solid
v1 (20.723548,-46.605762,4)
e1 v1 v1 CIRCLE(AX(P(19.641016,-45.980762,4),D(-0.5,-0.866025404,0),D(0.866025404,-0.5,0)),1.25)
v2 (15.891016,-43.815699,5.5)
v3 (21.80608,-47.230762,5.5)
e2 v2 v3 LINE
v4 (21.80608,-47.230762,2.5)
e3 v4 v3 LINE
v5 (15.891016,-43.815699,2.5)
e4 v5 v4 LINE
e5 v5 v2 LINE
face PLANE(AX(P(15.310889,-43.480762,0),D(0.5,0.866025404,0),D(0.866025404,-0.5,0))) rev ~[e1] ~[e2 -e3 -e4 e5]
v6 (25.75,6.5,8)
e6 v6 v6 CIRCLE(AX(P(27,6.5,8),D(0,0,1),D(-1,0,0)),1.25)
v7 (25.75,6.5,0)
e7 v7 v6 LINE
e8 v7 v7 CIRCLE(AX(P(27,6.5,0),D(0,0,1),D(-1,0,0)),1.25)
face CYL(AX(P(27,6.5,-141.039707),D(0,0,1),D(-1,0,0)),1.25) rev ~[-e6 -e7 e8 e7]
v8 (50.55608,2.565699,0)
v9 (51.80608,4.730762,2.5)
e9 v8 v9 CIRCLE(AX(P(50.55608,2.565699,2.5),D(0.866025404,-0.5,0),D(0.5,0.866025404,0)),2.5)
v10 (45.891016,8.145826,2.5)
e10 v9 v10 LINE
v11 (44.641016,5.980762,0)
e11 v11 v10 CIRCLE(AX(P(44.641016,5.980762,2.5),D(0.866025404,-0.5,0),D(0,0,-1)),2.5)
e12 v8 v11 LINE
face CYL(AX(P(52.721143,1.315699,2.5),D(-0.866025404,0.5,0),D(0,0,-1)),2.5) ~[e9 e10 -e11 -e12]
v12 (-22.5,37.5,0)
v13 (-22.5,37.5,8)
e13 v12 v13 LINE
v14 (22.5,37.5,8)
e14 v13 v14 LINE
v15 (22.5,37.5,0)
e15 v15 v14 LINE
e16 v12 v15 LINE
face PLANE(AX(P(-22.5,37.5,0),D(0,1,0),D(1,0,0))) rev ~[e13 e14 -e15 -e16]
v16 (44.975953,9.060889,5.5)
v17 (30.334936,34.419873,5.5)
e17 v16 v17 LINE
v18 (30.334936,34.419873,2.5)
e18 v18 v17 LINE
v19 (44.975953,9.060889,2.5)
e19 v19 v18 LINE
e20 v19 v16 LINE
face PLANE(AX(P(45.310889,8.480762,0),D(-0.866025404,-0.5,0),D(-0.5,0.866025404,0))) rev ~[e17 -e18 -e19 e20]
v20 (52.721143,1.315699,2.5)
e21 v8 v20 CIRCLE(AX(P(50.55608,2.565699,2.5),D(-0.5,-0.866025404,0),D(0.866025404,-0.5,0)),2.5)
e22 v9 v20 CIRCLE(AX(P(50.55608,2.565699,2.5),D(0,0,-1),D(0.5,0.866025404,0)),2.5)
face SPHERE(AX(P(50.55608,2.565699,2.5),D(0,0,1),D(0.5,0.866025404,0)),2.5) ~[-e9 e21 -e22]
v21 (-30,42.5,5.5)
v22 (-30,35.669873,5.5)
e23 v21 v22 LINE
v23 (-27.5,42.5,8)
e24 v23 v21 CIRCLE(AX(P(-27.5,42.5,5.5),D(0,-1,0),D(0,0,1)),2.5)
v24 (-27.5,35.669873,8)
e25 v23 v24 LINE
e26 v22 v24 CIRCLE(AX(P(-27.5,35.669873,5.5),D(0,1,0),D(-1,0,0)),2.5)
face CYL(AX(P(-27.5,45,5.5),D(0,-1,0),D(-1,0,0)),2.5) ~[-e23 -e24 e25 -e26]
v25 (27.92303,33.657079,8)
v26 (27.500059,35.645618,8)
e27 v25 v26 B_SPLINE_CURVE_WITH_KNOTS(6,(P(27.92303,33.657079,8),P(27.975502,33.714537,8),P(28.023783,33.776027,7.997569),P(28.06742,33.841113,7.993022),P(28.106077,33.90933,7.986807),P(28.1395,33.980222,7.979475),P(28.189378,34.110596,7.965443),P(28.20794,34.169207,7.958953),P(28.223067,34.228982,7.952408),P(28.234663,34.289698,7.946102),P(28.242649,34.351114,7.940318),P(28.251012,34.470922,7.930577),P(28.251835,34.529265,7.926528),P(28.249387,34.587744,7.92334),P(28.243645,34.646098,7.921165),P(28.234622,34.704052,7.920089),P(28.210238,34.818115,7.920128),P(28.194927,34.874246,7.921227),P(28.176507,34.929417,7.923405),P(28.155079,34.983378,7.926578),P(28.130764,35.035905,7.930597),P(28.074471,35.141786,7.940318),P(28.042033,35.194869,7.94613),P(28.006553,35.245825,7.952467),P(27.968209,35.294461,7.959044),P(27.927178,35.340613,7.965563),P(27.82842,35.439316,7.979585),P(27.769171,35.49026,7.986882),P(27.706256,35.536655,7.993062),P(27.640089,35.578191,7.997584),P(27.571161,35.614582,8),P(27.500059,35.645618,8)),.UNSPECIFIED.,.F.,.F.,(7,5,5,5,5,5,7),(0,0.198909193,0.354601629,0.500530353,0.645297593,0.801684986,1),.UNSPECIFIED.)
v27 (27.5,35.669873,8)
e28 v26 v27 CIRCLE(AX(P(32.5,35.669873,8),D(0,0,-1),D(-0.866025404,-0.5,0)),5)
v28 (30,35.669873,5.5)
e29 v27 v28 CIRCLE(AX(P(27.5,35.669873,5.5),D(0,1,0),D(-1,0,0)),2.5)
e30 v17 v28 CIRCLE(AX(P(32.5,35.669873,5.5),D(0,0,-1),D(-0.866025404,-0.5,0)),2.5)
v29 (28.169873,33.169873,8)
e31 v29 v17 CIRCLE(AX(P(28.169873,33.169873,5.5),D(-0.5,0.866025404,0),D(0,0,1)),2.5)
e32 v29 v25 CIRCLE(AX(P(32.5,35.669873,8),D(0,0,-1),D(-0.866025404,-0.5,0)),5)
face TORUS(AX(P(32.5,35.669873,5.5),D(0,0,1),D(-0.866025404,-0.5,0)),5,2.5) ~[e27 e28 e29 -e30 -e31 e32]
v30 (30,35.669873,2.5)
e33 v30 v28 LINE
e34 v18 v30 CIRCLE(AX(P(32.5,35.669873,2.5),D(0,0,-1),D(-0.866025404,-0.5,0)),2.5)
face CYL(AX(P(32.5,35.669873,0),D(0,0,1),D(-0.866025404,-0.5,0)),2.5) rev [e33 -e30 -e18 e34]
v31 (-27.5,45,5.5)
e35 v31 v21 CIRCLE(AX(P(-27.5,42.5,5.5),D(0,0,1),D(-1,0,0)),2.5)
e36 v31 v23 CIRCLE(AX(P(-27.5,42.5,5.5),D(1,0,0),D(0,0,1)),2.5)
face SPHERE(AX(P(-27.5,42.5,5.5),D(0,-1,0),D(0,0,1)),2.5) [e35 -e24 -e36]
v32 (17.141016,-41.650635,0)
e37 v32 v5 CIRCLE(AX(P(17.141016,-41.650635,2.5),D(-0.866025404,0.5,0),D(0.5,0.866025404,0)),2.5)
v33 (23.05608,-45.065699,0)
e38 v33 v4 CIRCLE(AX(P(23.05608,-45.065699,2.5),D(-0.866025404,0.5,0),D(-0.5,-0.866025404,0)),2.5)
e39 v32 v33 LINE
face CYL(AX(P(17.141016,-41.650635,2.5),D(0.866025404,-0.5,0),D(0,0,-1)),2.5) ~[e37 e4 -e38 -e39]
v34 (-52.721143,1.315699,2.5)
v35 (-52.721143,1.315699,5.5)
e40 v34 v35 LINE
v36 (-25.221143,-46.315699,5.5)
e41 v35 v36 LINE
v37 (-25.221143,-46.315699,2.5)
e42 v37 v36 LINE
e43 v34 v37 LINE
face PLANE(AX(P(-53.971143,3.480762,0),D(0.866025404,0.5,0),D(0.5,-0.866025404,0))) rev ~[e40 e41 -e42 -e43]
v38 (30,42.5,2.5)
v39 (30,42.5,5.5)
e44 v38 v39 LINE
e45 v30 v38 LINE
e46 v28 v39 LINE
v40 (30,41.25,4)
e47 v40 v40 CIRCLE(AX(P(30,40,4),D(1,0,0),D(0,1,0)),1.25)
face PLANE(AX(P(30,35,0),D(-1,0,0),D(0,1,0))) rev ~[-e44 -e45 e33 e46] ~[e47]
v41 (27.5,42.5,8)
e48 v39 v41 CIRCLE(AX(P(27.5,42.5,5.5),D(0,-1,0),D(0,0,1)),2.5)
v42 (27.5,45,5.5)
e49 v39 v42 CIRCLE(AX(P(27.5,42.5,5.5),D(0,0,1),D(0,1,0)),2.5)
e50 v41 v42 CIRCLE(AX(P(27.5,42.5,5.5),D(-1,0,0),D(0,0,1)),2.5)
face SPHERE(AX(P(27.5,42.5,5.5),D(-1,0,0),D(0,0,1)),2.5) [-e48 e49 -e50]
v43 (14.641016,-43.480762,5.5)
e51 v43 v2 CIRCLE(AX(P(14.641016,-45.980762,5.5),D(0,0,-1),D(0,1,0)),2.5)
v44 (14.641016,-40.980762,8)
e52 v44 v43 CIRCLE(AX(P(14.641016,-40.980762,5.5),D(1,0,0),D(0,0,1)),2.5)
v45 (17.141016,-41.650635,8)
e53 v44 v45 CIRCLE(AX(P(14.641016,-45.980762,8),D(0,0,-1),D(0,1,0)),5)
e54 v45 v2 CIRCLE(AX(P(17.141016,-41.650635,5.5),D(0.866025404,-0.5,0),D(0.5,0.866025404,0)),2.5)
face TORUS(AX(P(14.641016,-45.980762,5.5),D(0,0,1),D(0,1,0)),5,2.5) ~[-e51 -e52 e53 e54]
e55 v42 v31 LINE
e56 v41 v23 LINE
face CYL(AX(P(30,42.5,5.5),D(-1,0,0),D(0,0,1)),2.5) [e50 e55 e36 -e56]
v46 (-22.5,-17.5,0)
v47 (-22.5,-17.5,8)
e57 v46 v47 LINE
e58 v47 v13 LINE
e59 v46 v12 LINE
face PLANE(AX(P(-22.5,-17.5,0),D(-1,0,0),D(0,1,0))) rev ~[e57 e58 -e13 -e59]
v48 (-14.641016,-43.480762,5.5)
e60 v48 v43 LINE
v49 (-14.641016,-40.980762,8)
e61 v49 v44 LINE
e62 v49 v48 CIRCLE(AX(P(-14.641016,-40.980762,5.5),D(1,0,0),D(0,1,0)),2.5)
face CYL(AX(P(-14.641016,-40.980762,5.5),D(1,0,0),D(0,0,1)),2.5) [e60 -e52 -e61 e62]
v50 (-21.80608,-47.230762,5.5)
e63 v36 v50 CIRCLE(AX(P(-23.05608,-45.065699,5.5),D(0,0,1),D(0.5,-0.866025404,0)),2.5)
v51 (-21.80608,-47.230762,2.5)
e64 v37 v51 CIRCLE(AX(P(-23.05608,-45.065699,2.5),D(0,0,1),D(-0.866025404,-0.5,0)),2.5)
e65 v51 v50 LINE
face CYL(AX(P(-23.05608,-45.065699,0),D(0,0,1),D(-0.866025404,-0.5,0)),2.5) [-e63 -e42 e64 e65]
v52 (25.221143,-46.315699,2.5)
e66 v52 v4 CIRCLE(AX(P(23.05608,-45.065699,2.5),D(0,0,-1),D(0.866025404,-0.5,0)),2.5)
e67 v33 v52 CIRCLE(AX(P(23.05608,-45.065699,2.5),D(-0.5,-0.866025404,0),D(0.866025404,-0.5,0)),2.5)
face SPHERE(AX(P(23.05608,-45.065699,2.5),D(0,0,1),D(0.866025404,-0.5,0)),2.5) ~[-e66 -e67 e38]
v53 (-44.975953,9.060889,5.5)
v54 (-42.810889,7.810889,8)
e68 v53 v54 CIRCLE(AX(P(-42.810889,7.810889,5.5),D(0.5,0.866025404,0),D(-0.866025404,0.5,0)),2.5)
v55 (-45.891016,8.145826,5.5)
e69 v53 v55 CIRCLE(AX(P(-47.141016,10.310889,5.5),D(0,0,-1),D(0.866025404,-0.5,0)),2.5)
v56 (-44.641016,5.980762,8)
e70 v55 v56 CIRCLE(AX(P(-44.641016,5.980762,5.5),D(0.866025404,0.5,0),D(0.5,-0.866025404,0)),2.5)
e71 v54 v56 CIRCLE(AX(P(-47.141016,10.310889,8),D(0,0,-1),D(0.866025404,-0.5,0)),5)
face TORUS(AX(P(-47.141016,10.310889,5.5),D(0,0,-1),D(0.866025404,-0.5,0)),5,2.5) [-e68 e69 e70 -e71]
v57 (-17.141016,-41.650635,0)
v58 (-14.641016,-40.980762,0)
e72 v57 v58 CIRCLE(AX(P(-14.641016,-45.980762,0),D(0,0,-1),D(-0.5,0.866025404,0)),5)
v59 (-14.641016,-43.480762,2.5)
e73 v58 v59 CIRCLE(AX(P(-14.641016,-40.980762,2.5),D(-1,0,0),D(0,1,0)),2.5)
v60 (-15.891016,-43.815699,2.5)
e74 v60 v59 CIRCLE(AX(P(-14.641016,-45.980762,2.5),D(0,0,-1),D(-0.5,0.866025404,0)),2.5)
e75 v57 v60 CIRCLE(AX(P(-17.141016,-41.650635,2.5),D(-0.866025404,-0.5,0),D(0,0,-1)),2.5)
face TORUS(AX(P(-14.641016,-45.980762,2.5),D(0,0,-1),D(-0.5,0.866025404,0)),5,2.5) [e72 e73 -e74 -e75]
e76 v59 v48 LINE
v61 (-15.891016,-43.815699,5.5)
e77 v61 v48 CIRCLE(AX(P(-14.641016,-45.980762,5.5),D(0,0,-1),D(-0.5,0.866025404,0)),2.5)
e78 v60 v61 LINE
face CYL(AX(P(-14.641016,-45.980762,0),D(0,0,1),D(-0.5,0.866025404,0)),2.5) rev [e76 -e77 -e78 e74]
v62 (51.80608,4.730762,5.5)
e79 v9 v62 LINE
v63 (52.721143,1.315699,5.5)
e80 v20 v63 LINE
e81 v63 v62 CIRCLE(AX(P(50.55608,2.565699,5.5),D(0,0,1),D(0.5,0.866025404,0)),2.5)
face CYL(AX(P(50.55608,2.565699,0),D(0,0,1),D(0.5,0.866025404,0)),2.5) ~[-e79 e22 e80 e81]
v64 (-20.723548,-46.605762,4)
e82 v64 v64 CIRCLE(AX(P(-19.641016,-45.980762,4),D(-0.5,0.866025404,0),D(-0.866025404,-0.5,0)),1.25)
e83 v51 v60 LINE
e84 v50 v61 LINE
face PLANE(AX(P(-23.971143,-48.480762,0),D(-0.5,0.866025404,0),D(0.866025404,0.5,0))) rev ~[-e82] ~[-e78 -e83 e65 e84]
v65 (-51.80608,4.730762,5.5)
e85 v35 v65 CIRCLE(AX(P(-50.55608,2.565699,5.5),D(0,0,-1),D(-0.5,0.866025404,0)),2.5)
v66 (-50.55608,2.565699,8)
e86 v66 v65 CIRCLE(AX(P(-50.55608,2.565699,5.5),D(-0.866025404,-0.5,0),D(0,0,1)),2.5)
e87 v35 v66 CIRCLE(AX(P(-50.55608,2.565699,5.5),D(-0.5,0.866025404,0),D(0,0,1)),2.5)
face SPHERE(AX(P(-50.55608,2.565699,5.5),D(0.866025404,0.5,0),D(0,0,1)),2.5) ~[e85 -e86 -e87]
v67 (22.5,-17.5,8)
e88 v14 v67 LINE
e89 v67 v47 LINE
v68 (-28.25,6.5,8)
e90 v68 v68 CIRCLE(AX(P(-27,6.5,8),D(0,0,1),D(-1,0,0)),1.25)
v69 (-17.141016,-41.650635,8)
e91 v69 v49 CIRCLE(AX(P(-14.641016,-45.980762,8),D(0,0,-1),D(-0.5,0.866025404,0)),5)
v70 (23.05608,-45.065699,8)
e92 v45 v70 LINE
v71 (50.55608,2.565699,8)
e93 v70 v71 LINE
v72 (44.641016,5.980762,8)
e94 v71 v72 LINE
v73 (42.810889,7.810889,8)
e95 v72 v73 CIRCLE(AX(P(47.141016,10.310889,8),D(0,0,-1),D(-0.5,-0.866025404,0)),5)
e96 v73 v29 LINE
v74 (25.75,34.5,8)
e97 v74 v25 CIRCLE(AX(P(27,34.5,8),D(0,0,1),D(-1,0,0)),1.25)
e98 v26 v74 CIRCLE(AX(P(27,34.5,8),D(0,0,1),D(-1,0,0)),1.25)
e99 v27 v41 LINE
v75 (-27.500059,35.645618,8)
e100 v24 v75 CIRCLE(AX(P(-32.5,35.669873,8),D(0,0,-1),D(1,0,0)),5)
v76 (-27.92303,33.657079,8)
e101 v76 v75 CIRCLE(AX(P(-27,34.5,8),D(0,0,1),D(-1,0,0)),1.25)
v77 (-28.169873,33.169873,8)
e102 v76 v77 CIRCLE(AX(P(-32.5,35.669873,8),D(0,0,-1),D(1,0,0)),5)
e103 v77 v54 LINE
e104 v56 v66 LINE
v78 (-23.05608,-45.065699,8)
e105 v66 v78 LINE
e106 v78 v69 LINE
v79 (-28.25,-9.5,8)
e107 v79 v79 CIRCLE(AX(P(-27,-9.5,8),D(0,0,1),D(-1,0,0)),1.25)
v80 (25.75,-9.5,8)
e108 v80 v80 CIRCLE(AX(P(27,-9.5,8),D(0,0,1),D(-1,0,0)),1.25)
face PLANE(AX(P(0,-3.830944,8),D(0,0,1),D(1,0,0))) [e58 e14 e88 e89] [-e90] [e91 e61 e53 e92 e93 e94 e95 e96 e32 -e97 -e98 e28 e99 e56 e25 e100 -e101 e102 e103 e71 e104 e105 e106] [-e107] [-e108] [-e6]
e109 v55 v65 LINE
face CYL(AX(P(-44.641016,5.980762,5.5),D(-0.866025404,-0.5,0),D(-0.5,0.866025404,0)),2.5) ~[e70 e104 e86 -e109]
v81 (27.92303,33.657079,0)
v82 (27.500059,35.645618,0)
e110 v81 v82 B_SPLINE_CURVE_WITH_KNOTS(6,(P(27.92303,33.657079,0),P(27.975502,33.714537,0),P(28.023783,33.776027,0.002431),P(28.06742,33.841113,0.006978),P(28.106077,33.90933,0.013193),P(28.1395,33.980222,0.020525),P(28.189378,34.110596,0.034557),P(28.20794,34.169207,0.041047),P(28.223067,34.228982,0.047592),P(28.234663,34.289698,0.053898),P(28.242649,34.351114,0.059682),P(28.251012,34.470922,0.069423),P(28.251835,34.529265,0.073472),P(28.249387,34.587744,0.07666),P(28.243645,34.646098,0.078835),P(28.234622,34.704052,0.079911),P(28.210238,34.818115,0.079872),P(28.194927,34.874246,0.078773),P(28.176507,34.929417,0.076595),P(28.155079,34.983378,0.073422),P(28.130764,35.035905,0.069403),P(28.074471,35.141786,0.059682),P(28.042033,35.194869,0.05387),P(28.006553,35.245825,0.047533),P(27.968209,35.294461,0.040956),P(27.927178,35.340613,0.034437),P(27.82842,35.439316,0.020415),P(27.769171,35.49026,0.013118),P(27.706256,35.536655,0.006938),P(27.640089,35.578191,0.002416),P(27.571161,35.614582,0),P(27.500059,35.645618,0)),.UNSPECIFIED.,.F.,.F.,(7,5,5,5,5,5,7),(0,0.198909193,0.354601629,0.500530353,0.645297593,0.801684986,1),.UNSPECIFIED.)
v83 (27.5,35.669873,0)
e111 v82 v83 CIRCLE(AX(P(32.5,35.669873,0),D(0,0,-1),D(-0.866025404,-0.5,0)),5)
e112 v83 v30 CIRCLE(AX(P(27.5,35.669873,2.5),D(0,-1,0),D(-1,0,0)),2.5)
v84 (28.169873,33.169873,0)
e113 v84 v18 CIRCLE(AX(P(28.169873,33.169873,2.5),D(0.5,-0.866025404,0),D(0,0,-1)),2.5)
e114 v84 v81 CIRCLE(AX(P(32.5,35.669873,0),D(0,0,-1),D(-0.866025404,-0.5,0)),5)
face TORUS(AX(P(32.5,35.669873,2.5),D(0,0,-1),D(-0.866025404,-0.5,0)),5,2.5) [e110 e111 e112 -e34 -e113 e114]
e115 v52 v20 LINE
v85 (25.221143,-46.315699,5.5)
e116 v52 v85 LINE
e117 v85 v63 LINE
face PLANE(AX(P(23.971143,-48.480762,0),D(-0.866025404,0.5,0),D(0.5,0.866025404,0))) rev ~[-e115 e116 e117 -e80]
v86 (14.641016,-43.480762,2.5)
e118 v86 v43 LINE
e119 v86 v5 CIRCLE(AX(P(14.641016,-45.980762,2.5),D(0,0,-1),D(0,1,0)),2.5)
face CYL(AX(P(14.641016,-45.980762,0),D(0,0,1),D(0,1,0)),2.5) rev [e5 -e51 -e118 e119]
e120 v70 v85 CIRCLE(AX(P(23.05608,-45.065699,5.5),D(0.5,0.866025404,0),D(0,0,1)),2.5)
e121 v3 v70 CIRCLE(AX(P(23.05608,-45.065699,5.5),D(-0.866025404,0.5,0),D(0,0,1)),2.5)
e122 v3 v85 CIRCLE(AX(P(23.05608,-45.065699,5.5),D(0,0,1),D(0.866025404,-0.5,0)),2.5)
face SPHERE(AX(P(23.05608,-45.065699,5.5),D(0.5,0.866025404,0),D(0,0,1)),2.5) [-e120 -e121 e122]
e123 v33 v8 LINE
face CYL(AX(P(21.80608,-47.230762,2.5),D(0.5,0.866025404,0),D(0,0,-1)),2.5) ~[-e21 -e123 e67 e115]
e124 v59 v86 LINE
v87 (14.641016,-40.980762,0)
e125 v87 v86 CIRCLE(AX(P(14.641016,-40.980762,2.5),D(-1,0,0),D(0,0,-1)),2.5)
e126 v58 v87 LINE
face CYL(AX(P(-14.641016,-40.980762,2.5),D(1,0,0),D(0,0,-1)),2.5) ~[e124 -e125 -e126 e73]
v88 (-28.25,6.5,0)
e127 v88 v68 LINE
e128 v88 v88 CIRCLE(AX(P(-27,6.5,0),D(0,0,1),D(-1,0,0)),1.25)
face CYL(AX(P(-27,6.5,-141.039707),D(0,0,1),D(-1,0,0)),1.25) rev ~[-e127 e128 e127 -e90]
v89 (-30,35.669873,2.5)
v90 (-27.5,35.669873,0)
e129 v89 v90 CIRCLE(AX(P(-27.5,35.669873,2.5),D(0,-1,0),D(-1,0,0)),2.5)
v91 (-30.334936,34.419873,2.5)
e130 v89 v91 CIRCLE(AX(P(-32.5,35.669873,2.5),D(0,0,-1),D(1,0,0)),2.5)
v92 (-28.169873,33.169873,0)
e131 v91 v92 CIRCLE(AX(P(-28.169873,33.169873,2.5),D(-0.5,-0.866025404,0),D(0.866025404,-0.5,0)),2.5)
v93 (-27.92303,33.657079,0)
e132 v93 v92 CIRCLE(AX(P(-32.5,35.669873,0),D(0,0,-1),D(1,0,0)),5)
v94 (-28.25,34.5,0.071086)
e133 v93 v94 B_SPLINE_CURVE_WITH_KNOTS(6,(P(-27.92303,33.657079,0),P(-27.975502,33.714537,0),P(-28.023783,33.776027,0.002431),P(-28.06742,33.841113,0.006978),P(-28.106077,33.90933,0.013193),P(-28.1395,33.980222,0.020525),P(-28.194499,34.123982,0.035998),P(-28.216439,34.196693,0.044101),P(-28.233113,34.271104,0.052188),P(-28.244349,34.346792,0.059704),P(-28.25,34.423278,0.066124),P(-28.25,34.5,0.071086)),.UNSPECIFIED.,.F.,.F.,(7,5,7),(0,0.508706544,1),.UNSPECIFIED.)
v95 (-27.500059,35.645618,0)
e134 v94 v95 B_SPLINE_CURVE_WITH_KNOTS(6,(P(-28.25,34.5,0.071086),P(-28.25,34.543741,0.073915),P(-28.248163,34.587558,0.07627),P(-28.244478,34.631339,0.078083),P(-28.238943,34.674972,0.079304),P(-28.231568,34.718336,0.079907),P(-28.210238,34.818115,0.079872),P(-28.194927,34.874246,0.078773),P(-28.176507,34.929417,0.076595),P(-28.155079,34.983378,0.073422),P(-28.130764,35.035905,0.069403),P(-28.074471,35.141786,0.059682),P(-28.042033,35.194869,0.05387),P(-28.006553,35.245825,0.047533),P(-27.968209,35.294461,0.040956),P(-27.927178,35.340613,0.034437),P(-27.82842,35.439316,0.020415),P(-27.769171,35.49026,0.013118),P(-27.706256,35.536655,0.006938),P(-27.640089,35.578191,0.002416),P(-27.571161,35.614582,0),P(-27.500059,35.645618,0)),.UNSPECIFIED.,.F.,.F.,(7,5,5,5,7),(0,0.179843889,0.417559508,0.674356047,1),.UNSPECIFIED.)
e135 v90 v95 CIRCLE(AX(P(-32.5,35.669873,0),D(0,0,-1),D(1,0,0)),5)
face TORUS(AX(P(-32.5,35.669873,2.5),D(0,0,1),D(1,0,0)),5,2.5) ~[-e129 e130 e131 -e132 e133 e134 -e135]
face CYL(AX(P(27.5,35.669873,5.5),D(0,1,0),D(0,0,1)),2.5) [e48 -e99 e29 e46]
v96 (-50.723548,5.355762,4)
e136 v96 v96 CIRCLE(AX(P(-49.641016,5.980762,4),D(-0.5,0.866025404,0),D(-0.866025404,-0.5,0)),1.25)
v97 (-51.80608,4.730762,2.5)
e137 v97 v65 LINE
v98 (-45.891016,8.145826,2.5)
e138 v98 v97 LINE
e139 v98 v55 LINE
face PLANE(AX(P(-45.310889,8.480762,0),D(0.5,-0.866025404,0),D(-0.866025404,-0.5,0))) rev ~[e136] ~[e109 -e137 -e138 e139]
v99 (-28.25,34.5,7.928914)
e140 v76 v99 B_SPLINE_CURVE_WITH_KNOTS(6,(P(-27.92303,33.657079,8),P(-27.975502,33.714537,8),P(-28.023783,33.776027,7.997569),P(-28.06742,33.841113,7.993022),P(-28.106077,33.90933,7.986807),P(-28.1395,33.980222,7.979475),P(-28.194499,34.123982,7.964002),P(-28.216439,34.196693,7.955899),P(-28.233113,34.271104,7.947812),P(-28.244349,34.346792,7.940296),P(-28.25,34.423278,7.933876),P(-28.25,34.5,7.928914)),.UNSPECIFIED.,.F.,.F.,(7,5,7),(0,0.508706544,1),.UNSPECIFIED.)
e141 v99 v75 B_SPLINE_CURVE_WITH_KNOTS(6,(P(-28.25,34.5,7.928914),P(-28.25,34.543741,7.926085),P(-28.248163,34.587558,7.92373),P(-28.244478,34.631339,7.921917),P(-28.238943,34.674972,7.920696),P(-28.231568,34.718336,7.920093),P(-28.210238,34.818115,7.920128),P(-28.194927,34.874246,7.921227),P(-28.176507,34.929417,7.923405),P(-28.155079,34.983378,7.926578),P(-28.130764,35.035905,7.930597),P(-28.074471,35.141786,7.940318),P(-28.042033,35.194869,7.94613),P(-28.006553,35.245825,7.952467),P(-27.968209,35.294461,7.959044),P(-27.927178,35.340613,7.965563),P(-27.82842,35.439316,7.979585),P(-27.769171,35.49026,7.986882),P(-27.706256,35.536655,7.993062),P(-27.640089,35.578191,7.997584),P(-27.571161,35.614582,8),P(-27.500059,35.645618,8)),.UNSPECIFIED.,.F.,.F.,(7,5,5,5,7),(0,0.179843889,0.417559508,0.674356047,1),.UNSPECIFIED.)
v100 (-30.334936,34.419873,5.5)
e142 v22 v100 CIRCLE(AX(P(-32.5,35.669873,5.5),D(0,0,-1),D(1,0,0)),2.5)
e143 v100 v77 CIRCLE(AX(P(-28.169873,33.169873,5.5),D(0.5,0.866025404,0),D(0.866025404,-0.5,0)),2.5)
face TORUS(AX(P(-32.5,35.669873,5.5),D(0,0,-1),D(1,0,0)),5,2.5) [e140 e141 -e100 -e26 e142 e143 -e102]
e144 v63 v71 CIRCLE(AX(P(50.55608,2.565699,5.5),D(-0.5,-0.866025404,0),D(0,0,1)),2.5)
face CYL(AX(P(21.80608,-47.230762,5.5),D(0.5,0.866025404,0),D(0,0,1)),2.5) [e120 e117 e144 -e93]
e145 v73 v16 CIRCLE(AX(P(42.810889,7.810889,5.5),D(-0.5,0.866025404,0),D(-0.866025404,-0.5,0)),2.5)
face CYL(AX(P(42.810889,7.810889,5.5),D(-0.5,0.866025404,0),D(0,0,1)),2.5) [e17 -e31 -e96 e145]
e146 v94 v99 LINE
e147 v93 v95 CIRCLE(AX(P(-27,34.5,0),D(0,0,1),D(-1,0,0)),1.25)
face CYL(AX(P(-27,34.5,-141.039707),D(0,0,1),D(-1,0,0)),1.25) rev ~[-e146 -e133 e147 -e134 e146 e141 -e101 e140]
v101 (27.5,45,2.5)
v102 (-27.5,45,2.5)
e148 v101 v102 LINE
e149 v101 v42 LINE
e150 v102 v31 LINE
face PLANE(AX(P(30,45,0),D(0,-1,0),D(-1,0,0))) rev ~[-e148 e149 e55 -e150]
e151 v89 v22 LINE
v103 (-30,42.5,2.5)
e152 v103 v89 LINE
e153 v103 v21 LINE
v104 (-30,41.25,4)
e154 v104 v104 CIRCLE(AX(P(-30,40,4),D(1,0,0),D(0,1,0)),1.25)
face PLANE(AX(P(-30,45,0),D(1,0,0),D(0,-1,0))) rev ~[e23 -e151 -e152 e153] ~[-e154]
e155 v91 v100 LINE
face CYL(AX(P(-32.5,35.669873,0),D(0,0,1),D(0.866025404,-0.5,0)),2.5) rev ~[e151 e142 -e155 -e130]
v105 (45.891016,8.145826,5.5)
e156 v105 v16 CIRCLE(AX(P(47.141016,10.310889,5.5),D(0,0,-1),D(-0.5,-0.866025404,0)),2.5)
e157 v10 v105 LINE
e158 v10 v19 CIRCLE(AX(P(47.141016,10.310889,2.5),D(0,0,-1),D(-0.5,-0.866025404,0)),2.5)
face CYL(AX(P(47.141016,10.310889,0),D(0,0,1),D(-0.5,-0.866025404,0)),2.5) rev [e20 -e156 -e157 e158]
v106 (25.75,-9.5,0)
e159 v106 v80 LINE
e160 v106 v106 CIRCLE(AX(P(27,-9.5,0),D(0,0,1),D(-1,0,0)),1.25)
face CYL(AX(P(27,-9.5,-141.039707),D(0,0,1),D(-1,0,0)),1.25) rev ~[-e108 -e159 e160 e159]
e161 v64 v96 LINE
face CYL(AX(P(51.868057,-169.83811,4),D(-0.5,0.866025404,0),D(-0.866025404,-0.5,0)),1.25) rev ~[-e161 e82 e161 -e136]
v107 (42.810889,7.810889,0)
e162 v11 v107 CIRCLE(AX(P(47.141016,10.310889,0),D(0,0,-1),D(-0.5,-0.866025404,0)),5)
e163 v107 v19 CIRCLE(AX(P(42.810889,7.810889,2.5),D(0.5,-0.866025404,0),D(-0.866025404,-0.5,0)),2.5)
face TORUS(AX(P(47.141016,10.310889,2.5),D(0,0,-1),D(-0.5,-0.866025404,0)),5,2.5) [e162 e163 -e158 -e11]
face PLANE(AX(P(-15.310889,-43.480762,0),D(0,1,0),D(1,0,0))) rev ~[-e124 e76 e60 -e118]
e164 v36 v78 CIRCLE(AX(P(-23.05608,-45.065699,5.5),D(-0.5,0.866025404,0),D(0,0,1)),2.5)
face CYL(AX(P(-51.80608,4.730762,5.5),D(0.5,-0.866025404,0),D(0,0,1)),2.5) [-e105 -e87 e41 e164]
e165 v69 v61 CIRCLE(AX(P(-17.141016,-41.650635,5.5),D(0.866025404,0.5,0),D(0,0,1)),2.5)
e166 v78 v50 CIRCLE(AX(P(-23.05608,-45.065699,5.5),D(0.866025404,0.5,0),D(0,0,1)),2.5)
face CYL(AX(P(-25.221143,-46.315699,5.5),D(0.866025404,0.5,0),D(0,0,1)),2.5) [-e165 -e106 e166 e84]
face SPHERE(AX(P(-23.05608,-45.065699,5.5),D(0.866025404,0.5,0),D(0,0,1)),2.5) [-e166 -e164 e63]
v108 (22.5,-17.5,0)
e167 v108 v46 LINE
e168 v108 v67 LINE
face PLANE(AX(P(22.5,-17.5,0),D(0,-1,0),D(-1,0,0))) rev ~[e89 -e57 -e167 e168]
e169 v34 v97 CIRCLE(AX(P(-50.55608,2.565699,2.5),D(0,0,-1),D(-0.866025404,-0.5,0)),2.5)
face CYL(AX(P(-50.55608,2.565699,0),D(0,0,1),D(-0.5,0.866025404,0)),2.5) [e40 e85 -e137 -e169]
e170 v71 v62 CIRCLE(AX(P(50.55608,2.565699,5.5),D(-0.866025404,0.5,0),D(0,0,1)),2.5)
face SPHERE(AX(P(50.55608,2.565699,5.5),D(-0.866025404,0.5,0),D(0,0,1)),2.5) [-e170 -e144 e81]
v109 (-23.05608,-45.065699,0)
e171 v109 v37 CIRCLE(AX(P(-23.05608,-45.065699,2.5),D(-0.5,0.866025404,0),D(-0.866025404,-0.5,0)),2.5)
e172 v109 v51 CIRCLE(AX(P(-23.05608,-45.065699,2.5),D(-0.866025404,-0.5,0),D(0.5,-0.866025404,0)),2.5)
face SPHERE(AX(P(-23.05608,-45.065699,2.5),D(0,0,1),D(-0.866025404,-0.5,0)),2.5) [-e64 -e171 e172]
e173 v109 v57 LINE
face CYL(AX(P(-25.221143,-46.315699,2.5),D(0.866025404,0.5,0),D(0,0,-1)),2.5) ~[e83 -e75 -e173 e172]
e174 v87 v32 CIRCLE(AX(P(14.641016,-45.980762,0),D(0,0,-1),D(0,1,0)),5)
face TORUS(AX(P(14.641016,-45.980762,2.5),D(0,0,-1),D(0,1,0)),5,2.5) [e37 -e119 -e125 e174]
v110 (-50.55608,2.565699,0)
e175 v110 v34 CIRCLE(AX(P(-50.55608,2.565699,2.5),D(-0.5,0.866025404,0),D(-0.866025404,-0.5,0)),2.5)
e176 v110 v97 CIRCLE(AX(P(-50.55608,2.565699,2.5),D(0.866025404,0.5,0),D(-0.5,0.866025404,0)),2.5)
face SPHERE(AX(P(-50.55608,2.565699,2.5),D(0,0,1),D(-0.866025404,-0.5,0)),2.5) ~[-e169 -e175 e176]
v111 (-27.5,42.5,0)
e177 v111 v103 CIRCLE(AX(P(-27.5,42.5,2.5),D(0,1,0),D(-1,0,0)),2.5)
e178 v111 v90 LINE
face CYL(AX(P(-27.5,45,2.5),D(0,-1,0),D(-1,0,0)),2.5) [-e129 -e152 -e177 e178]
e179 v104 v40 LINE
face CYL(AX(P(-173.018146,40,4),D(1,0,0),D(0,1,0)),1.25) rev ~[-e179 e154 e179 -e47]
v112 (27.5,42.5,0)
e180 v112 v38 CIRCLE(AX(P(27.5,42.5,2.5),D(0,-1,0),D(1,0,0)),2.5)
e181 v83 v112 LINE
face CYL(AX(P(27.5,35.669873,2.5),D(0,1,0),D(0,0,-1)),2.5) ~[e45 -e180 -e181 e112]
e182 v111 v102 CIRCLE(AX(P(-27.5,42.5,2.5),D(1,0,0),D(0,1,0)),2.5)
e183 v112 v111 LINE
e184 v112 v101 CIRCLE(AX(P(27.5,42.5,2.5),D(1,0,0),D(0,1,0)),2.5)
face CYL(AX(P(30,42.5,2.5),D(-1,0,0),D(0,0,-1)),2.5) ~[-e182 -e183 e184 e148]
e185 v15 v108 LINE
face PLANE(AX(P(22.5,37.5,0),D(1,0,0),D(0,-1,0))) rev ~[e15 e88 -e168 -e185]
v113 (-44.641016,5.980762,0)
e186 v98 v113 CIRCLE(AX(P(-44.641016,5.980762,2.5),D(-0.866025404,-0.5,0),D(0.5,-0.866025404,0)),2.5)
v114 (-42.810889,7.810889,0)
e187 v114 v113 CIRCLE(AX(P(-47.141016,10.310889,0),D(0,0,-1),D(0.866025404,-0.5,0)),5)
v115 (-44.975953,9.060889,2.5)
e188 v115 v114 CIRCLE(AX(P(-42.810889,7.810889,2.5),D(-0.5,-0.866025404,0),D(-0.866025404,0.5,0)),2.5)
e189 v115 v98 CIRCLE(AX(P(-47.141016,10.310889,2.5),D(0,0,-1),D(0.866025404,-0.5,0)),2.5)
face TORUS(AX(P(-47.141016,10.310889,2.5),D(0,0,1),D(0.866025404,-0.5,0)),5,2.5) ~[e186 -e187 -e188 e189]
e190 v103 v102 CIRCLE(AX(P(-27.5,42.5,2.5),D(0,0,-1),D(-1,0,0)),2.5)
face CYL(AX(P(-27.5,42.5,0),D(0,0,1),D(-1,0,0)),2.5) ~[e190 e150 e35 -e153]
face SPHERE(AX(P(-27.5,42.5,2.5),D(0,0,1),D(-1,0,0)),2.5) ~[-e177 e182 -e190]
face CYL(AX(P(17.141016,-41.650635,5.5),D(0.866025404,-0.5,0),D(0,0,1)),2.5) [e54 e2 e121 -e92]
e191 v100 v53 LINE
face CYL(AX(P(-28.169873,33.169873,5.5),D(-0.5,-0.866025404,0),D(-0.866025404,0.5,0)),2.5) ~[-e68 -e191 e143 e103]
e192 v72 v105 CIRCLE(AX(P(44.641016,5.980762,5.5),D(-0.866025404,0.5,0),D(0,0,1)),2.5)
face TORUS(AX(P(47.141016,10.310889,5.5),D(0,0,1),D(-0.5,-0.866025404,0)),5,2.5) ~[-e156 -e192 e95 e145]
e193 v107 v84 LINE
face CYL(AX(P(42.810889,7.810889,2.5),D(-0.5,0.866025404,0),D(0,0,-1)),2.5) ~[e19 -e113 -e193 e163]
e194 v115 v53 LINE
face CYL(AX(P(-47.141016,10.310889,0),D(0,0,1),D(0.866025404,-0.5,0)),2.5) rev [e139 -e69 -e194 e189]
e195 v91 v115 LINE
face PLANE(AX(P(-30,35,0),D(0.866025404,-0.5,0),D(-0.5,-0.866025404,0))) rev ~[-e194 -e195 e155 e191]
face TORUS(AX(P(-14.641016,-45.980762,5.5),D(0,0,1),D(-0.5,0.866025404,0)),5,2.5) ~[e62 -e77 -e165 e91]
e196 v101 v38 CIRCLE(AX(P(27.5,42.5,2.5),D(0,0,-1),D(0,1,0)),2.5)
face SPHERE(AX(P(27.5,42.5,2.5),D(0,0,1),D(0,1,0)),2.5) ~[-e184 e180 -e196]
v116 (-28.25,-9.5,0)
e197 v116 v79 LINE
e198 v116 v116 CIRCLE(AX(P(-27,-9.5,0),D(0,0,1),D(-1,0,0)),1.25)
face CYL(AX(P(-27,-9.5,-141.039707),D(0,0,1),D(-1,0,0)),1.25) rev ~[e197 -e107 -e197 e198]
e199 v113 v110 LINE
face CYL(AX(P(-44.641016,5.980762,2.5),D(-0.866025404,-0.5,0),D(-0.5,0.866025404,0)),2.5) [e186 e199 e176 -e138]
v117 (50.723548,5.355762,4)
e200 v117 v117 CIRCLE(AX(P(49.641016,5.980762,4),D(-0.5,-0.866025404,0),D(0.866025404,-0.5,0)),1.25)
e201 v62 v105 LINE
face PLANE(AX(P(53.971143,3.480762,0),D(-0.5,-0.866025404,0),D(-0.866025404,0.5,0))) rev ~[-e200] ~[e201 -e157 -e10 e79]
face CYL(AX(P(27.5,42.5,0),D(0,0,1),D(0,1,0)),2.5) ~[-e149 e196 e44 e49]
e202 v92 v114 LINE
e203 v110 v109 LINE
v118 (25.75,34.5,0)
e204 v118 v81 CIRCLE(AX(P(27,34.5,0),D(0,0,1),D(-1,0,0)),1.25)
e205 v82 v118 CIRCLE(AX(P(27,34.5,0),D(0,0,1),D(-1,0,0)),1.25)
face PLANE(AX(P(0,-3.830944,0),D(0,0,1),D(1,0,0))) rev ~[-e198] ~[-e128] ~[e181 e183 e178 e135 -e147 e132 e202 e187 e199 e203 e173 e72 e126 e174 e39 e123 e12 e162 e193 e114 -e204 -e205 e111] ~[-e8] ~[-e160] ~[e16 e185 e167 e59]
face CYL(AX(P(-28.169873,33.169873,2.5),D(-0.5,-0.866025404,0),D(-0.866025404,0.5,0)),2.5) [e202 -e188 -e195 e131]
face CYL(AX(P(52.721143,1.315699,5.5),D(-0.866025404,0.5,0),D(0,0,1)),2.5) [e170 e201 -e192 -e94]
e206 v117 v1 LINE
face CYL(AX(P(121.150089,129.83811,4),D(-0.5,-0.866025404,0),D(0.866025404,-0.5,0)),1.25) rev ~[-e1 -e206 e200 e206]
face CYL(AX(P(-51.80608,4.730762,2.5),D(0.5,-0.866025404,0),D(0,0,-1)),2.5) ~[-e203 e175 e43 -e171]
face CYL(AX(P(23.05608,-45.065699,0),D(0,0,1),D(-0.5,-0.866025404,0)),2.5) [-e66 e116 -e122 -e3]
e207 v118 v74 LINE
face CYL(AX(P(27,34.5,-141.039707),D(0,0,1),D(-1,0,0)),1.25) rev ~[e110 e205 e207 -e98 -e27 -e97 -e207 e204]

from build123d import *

# Parameters (mm, degrees)
F1_DEPTH = 8
F3_D     = 2.5
F5_D     = 2.5
F7_D     = 2.5
F8_F1_R  = 2.5
F8_F2_R  = 2.5
F9_D     = 2.5


with BuildPart() as f1:
    # F0 (on Top) → F1 (new body)
    with BuildSketch(Plane.XY):
        Polygon((-22.5, 35), (-30, 35), (-45.3108891325, 8.4807621135), (-15.3108891325, -43.4807621135), (15.3108891325, -43.4807621135), (45.3108891325, 8.4807621135), (30, 35), (22.5, 35), (22.5, 17.5), (22.5, -17.5), (-22.5, -17.5), (-22.5, 17.5), align=None)
        Polygon((-15.3108891325, -43.4807621135), (-45.3108891325, 8.4807621135), (-53.9711431703, 3.4807621135), (-23.9711431703, -48.4807621135), align=None)
        Polygon((30, 45), (-30, 45), (-30, 35), (-22.5, 35), (-22.5, 37.5), (22.5, 37.5), (22.5, 35), (30, 35), align=None)
        Polygon((53.9711431703, 3.4807621135), (45.3108891325, 8.4807621135), (15.3108891325, -43.4807621135), (23.9711431703, -48.4807621135), align=None)
    extrude(amount=F1_DEPTH)

    # F3 (through all)
    with Locations(Plane(origin=(-30, 0, 0), x_dir=(0, -1, 0), z_dir=(-1, 0, 0))):
        with Locations((-40, 4)):
            Hole(F3_D / 2)

    # F5 (through all)
    with Locations(Plane(origin=(15, -25.9807621135, 0), x_dir=(0.8660254038, 0.5, 0), z_dir=(0.5, -0.8660254038, 0))):
        with Locations((-40, 4)):
            Hole(F5_D / 2)

    # F7 (through all)
    with Locations(Plane(origin=(15, 25.9807621135, 0), x_dir=(-0.8660254038, 0.5, 0), z_dir=(0.5, 0.8660254038, 0))):
        with Locations((-40, 4)):
            Hole(F7_D / 2)

    # F8: fillet of radius 2.5 on 32 edges, made by hand

    # F8_f1
    f8_f1_edges = [f1.edges().sort_by_distance(p)[0] for p in [
        (-45.3108891325, 8.4807621135, 4),
        (-30, 35, 4),
        (30, 35, 4),
        (45.3108891325, 8.4807621135, 4),
        (15.3108891325, -43.4807621135, 4),
        (-15.3108891325, -43.4807621135, 4),
    ]]
    fillet(f8_f1_edges, radius=F8_F1_R)

    # F8_f2
    f8_f2_edges = [f1.edges().sort_by_distance(p)[0] for p in [
        (-37.6554445662, 21.7403810568, 8),
        (-30, 40.3349364905, 8),
        (0, 45, 8),
        (37.6554445662, 21.7403810568, 8),
        (30, 40.3349364905, 8),
        (49.9310796608, 5.8132938683, 8),
        (38.9711431703, -22.5, 8),
        (19.9310796608, -46.1482303588, 8),
        (0, -43.4807621135, 8),
        (-19.9310796608, -46.1482303588, 8),
        (-38.9711431703, -22.5, 8),
        (-49.9310796608, 5.8132938683, 8),
        (-53.9711431703, 3.4807621135, 4),
        (-30, 45, 4),
        (30, 45, 4),
        (53.9711431703, 3.4807621135, 4),
        (23.9711431703, -48.4807621135, 4),
        (-23.9711431703, -48.4807621135, 4),
        (-38.9711431703, -22.5, 0),
        (-37.6554445662, 21.7403810568, 0),
        (0, 45, 0),
        (30, 40.3349364905, 0),
        (38.9711431703, -22.5, 0),
        (19.9310796608, -46.1482303588, 0),
        (0, -43.4807621135, 0),
        (-19.9310796608, -46.1482303588, 0),
        (-15.2880637641, -43.5659475478, 0),
        (15.2880637641, -43.5659475478, 0),
        (30.0851854343, 35.0228253683, 0),
        (-30.0851854343, 35.0228253683, 0),
        (-45.3732491984, 8.5431221795, 0),
        (-45.3732491984, 8.5431221795, 8),
        (-15.2880637641, -43.5659475478, 8),
        (15.2880637641, -43.5659475478, 8),
        (45.3732491984, 8.5431221795, 8),
        (30.0851854343, 35.0228253683, 8),
        (-30.0851854343, 35.0228253683, 8),
    ]]
    fillet(f8_f2_edges, radius=F8_F2_R)

    # F9 (through all)
    with Locations(Plane(origin=(0, 0, 0), x_dir=(1, 0, 0), z_dir=(0, 0, -1))):
        with Locations((-27, -6.5), (-27, 9.5), (27, 9.5), (27, -6.5), (-27, -34.5), (27, -34.5)):
            Hole(F9_D / 2)


solid = f1.part
